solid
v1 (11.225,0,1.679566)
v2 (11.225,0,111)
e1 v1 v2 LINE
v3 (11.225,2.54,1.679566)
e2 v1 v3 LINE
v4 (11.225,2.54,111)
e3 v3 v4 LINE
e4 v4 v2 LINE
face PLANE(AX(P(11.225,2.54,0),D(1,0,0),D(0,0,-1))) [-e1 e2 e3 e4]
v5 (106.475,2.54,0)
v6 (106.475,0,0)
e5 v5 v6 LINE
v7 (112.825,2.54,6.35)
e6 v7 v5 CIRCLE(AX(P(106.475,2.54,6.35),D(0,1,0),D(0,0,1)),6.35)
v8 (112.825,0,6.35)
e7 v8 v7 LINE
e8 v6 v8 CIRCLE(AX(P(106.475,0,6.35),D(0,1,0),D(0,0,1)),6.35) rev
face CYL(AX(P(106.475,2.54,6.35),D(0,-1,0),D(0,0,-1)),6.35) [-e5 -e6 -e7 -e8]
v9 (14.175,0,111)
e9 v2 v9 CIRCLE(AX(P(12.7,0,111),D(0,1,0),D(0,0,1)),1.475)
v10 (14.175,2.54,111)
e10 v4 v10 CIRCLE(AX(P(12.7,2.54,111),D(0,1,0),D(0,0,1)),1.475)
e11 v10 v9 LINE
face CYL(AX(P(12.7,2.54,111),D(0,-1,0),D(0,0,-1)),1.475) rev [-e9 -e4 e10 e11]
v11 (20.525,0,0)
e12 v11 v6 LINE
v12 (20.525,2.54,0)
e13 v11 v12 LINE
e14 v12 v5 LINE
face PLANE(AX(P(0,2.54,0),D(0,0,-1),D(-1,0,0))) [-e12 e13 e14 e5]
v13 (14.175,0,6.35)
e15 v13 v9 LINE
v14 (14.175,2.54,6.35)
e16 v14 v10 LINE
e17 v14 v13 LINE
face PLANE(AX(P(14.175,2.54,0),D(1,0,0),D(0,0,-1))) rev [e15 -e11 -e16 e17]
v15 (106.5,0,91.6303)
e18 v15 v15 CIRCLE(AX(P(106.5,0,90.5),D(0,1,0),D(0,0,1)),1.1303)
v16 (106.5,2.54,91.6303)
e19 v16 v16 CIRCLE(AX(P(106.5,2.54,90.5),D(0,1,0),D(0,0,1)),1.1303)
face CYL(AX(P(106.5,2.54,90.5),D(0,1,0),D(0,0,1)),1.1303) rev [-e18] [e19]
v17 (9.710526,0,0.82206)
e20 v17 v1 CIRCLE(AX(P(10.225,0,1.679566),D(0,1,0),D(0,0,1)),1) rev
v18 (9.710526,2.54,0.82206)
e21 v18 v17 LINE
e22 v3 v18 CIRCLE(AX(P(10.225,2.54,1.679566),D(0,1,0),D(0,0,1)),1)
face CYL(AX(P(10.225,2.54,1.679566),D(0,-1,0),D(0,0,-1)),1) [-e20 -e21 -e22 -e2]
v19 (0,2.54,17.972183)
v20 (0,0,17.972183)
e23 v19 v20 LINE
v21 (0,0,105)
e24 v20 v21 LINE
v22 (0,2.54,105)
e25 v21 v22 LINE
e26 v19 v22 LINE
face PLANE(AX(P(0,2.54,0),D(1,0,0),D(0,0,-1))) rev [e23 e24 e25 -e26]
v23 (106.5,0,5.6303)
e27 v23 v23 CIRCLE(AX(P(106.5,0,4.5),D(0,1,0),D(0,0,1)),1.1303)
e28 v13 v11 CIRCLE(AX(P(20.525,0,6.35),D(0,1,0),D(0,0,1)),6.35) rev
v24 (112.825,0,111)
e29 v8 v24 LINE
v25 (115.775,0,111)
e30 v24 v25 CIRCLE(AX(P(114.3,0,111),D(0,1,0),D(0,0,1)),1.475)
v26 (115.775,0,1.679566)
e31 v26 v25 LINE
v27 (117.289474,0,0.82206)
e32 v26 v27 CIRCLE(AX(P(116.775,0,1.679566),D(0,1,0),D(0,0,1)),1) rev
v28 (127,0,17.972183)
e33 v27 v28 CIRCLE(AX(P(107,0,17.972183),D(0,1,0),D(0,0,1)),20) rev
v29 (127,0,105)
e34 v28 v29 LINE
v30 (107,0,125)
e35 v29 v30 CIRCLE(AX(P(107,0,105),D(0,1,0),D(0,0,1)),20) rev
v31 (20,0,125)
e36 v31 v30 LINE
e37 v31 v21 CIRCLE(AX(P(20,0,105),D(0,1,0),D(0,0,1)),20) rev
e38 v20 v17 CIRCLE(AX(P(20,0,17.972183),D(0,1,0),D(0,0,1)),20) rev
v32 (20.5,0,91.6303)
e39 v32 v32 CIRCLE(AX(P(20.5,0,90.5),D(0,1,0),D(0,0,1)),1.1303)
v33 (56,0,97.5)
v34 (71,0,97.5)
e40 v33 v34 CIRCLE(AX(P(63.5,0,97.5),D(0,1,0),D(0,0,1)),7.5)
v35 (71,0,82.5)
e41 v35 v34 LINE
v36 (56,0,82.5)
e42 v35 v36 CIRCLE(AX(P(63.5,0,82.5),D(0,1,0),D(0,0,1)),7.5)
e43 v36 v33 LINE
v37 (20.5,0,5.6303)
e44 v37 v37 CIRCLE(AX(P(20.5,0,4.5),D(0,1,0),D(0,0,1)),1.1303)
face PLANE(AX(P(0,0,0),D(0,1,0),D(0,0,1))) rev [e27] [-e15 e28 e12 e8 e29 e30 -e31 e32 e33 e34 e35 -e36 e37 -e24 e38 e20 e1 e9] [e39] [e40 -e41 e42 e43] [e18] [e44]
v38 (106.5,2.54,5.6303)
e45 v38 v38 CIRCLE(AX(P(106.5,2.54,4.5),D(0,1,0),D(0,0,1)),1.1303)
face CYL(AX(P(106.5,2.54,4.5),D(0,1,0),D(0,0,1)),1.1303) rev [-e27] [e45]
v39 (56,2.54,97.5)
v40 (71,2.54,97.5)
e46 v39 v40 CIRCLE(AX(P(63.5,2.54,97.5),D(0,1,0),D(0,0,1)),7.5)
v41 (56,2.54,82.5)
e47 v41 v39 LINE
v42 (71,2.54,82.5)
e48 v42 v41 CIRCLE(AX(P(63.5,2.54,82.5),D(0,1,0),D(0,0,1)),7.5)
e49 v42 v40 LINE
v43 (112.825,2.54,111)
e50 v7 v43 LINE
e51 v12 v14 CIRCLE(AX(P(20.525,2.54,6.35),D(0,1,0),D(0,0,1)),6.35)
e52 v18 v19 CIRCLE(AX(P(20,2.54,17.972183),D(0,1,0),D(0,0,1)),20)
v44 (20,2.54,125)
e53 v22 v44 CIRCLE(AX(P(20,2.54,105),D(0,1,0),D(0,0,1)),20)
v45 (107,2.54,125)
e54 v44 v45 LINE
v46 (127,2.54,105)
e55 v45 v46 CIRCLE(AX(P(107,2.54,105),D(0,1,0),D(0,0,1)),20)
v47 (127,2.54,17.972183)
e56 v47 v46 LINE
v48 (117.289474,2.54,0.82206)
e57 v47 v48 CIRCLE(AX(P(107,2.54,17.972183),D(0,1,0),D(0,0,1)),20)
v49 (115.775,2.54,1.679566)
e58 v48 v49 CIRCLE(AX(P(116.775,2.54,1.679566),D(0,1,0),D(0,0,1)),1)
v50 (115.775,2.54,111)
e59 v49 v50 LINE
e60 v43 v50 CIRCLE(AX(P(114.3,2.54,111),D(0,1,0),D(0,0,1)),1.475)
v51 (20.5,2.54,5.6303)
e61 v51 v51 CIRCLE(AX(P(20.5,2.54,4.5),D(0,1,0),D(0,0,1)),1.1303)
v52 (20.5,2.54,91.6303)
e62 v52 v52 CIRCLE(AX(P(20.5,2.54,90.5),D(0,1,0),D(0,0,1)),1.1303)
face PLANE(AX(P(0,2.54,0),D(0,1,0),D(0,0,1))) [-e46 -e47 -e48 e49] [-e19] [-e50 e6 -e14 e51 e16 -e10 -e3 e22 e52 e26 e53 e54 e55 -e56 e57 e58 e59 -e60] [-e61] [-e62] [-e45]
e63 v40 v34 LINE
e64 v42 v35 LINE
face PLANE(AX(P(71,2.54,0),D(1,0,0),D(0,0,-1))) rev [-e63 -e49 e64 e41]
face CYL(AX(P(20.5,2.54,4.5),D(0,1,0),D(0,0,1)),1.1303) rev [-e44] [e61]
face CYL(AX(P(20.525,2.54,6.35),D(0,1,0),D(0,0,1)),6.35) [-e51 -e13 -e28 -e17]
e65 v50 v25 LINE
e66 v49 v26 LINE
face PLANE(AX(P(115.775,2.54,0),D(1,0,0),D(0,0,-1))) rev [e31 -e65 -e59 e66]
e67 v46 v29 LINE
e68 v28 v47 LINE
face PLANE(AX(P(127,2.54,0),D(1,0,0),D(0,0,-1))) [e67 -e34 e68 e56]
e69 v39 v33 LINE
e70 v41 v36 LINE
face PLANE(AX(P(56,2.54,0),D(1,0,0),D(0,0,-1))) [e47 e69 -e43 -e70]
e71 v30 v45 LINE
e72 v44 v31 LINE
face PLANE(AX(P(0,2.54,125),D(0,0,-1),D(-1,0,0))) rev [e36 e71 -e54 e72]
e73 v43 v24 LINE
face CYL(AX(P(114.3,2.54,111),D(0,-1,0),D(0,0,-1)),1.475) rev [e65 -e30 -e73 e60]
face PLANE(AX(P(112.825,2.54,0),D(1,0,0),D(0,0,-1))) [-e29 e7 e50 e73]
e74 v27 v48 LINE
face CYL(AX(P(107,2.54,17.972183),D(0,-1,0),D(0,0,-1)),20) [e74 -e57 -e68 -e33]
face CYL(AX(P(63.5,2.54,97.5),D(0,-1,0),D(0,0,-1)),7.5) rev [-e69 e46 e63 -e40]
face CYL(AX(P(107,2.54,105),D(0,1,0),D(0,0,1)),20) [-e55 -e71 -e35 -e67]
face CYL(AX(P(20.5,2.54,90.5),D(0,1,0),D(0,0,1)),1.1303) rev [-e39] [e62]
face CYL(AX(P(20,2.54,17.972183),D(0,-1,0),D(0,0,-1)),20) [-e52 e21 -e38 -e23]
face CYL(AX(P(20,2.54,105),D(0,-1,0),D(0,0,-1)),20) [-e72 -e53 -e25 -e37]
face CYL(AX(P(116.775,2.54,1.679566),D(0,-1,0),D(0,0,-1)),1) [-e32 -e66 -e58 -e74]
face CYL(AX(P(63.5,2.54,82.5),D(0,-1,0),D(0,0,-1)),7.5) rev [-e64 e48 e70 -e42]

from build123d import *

# Parameters (mm, degrees)
SKETCH1_R             = 1.13
BOSS_EXTRUDE1_DEPTH   = 2.54
FILLET1_R             = 20
FILLET6_R             = 6.35
FILLET7_R             = 1
F_4_40_TAPPED_HOLE1_D = 2.2606


with BuildPart() as part:
    # Sketch1 → Boss-Extrude1 (new body)
    with BuildSketch(Plane(origin=(0, 0, 0), x_dir=(1, 0, 0), z_dir=(0, 1, 0))):
        with BuildLine():
            Line((11.225, 0), (0, 0))
            Line((0, 0), (0, -125))
            Line((0, -125), (127, -125))
            Line((127, -125), (127, 0))
            Line((127, 0), (115.775, 0))
            Line((115.775, 0), (115.775, -111))
            ThreePointArc((115.775, -111), (114.3, -112.475), (112.825, -111))
            Line((112.825, -111), (112.825, 0))
            Line((112.825, 0), (14.175, 0))
            Line((14.175, 0), (14.175, -111))
            ThreePointArc((14.175, -111), (12.7, -112.475), (11.225, -111))
            Line((11.225, -111), (11.225, 0))
        make_face()
        with BuildLine():
            ThreePointArc((71, -97.5), (63.5, -105), (56, -97.5))
            Line((56, -97.5), (56, -82.5))
            ThreePointArc((56, -82.5), (63.5, -75), (71, -82.5))
            Line((71, -82.5), (71, -97.5))
        make_face(mode=Mode.SUBTRACT)
        with Locations(Location((106.5, -4.5, 0), (0, 0, 270))):
            Circle(SKETCH1_R, mode=Mode.SUBTRACT)
        with Locations(Location((20.5, -90.5, 0), (0, 0, 270))):
            Circle(SKETCH1_R, mode=Mode.SUBTRACT)
        with Locations(Location((106.5, -90.5, 0), (0, 0, 270))):
            Circle(SKETCH1_R, mode=Mode.SUBTRACT)
        with Locations(Location((20.5, -4.5, 0), (0, 0, 270))):
            Circle(SKETCH1_R, mode=Mode.SUBTRACT)
    extrude(amount=BOSS_EXTRUDE1_DEPTH)

    # Fillet1
    # the kernel refuses this fillet: 20 mm, written as the material it takes off along each edge
    with BuildSketch(Plane(origin=(0, -44.930458419, 0), x_dir=(1, 0, 0), z_dir=(0, 1, 0))) as fillet1_piece_1:
        with BuildLine():
            CenterArc((20, -17.972183368), FILLET1_R, 116.024153389, 63.975846611)
            Line((0, -17.972183368), (-0.4, -17.972183368))
            Line((-0.4, -17.972183368), (-0.4, 0))
            Line((-0.4, 0), (0, 0.4))
            ThreePointArc((0, 0.4), (5.6125, 0.4), (11.0495, 0.359443667))
            Line((11.0495, 0.359443667), (11.225, 0))
        make_face()
    extrude(amount=92.400916838, mode=Mode.SUBTRACT)
    with BuildSketch(Plane(origin=(127, -44.930458419, 0), x_dir=(0, 0, 1), z_dir=(0, 1, 0))) as fillet1_piece_2:
        with BuildLine():
            CenterArc((17.972183368, -20), FILLET1_R, 90, 63.975846611)
            Line((0, -11.225), (-0.359443667, -11.0495))
            ThreePointArc((-0.359443667, -11.0495), (-0.4, -5.6125), (-0.4, 0))
            Line((-0.4, 0), (0, 0.4))
            Line((0, 0.4), (17.972183368, 0.4))
            Line((17.972183368, 0.4), (17.972183368, 0))
        make_face()
    extrude(amount=92.400916838, mode=Mode.SUBTRACT)
    with BuildSketch(Plane(origin=(127, -50, 125), x_dir=(-1, 0, 0), z_dir=(0, 1, 0)), Plane(origin=(0, -50, 125), x_dir=(0, 0, -1), z_dir=(0, 1, 0))) as fillet1_piece_3:
        with BuildLine():
            CenterArc((FILLET1_R, -FILLET1_R), FILLET1_R, 90, 90)
            Line((0, -FILLET1_R), (-FILLET1_R * 0.02, -FILLET1_R))
            Line((-FILLET1_R * 0.02, -FILLET1_R), (-FILLET1_R * 0.02, FILLET1_R * 0.02))
            Line((-FILLET1_R * 0.02, FILLET1_R * 0.02), (FILLET1_R, FILLET1_R * 0.02))
            Line((FILLET1_R, FILLET1_R * 0.02), (FILLET1_R, 0))
        make_face()
    extrude(amount=102.54, mode=Mode.SUBTRACT)

    # Fillet6
    fillet6_edges = [part.edges().sort_by_distance(p)[0] for p in [
        (112.825, 1.27, 0),
        (14.175, 1.27, 0),
    ]]
    fillet(fillet6_edges, radius=FILLET6_R)

    # Fillet7
    fillet7_edges = [part.edges().sort_by_distance(p)[0] for p in [
        (115.775, 1.27, 0),
        (11.225, 1.27, 0),
    ]]
    fillet(fillet7_edges, radius=FILLET7_R)

    # #4-40 Tapped Hole1 (through all)
    with Locations(Plane(origin=(106.5, 2.54, 4.5), x_dir=(0, 0, 1), z_dir=(0, 1, 0))):
        with Locations((0, 0), (0, -86), (86, 0), (86, -86)):
            Hole(F_4_40_TAPPED_HOLE1_D / 2)


solid = part.part
